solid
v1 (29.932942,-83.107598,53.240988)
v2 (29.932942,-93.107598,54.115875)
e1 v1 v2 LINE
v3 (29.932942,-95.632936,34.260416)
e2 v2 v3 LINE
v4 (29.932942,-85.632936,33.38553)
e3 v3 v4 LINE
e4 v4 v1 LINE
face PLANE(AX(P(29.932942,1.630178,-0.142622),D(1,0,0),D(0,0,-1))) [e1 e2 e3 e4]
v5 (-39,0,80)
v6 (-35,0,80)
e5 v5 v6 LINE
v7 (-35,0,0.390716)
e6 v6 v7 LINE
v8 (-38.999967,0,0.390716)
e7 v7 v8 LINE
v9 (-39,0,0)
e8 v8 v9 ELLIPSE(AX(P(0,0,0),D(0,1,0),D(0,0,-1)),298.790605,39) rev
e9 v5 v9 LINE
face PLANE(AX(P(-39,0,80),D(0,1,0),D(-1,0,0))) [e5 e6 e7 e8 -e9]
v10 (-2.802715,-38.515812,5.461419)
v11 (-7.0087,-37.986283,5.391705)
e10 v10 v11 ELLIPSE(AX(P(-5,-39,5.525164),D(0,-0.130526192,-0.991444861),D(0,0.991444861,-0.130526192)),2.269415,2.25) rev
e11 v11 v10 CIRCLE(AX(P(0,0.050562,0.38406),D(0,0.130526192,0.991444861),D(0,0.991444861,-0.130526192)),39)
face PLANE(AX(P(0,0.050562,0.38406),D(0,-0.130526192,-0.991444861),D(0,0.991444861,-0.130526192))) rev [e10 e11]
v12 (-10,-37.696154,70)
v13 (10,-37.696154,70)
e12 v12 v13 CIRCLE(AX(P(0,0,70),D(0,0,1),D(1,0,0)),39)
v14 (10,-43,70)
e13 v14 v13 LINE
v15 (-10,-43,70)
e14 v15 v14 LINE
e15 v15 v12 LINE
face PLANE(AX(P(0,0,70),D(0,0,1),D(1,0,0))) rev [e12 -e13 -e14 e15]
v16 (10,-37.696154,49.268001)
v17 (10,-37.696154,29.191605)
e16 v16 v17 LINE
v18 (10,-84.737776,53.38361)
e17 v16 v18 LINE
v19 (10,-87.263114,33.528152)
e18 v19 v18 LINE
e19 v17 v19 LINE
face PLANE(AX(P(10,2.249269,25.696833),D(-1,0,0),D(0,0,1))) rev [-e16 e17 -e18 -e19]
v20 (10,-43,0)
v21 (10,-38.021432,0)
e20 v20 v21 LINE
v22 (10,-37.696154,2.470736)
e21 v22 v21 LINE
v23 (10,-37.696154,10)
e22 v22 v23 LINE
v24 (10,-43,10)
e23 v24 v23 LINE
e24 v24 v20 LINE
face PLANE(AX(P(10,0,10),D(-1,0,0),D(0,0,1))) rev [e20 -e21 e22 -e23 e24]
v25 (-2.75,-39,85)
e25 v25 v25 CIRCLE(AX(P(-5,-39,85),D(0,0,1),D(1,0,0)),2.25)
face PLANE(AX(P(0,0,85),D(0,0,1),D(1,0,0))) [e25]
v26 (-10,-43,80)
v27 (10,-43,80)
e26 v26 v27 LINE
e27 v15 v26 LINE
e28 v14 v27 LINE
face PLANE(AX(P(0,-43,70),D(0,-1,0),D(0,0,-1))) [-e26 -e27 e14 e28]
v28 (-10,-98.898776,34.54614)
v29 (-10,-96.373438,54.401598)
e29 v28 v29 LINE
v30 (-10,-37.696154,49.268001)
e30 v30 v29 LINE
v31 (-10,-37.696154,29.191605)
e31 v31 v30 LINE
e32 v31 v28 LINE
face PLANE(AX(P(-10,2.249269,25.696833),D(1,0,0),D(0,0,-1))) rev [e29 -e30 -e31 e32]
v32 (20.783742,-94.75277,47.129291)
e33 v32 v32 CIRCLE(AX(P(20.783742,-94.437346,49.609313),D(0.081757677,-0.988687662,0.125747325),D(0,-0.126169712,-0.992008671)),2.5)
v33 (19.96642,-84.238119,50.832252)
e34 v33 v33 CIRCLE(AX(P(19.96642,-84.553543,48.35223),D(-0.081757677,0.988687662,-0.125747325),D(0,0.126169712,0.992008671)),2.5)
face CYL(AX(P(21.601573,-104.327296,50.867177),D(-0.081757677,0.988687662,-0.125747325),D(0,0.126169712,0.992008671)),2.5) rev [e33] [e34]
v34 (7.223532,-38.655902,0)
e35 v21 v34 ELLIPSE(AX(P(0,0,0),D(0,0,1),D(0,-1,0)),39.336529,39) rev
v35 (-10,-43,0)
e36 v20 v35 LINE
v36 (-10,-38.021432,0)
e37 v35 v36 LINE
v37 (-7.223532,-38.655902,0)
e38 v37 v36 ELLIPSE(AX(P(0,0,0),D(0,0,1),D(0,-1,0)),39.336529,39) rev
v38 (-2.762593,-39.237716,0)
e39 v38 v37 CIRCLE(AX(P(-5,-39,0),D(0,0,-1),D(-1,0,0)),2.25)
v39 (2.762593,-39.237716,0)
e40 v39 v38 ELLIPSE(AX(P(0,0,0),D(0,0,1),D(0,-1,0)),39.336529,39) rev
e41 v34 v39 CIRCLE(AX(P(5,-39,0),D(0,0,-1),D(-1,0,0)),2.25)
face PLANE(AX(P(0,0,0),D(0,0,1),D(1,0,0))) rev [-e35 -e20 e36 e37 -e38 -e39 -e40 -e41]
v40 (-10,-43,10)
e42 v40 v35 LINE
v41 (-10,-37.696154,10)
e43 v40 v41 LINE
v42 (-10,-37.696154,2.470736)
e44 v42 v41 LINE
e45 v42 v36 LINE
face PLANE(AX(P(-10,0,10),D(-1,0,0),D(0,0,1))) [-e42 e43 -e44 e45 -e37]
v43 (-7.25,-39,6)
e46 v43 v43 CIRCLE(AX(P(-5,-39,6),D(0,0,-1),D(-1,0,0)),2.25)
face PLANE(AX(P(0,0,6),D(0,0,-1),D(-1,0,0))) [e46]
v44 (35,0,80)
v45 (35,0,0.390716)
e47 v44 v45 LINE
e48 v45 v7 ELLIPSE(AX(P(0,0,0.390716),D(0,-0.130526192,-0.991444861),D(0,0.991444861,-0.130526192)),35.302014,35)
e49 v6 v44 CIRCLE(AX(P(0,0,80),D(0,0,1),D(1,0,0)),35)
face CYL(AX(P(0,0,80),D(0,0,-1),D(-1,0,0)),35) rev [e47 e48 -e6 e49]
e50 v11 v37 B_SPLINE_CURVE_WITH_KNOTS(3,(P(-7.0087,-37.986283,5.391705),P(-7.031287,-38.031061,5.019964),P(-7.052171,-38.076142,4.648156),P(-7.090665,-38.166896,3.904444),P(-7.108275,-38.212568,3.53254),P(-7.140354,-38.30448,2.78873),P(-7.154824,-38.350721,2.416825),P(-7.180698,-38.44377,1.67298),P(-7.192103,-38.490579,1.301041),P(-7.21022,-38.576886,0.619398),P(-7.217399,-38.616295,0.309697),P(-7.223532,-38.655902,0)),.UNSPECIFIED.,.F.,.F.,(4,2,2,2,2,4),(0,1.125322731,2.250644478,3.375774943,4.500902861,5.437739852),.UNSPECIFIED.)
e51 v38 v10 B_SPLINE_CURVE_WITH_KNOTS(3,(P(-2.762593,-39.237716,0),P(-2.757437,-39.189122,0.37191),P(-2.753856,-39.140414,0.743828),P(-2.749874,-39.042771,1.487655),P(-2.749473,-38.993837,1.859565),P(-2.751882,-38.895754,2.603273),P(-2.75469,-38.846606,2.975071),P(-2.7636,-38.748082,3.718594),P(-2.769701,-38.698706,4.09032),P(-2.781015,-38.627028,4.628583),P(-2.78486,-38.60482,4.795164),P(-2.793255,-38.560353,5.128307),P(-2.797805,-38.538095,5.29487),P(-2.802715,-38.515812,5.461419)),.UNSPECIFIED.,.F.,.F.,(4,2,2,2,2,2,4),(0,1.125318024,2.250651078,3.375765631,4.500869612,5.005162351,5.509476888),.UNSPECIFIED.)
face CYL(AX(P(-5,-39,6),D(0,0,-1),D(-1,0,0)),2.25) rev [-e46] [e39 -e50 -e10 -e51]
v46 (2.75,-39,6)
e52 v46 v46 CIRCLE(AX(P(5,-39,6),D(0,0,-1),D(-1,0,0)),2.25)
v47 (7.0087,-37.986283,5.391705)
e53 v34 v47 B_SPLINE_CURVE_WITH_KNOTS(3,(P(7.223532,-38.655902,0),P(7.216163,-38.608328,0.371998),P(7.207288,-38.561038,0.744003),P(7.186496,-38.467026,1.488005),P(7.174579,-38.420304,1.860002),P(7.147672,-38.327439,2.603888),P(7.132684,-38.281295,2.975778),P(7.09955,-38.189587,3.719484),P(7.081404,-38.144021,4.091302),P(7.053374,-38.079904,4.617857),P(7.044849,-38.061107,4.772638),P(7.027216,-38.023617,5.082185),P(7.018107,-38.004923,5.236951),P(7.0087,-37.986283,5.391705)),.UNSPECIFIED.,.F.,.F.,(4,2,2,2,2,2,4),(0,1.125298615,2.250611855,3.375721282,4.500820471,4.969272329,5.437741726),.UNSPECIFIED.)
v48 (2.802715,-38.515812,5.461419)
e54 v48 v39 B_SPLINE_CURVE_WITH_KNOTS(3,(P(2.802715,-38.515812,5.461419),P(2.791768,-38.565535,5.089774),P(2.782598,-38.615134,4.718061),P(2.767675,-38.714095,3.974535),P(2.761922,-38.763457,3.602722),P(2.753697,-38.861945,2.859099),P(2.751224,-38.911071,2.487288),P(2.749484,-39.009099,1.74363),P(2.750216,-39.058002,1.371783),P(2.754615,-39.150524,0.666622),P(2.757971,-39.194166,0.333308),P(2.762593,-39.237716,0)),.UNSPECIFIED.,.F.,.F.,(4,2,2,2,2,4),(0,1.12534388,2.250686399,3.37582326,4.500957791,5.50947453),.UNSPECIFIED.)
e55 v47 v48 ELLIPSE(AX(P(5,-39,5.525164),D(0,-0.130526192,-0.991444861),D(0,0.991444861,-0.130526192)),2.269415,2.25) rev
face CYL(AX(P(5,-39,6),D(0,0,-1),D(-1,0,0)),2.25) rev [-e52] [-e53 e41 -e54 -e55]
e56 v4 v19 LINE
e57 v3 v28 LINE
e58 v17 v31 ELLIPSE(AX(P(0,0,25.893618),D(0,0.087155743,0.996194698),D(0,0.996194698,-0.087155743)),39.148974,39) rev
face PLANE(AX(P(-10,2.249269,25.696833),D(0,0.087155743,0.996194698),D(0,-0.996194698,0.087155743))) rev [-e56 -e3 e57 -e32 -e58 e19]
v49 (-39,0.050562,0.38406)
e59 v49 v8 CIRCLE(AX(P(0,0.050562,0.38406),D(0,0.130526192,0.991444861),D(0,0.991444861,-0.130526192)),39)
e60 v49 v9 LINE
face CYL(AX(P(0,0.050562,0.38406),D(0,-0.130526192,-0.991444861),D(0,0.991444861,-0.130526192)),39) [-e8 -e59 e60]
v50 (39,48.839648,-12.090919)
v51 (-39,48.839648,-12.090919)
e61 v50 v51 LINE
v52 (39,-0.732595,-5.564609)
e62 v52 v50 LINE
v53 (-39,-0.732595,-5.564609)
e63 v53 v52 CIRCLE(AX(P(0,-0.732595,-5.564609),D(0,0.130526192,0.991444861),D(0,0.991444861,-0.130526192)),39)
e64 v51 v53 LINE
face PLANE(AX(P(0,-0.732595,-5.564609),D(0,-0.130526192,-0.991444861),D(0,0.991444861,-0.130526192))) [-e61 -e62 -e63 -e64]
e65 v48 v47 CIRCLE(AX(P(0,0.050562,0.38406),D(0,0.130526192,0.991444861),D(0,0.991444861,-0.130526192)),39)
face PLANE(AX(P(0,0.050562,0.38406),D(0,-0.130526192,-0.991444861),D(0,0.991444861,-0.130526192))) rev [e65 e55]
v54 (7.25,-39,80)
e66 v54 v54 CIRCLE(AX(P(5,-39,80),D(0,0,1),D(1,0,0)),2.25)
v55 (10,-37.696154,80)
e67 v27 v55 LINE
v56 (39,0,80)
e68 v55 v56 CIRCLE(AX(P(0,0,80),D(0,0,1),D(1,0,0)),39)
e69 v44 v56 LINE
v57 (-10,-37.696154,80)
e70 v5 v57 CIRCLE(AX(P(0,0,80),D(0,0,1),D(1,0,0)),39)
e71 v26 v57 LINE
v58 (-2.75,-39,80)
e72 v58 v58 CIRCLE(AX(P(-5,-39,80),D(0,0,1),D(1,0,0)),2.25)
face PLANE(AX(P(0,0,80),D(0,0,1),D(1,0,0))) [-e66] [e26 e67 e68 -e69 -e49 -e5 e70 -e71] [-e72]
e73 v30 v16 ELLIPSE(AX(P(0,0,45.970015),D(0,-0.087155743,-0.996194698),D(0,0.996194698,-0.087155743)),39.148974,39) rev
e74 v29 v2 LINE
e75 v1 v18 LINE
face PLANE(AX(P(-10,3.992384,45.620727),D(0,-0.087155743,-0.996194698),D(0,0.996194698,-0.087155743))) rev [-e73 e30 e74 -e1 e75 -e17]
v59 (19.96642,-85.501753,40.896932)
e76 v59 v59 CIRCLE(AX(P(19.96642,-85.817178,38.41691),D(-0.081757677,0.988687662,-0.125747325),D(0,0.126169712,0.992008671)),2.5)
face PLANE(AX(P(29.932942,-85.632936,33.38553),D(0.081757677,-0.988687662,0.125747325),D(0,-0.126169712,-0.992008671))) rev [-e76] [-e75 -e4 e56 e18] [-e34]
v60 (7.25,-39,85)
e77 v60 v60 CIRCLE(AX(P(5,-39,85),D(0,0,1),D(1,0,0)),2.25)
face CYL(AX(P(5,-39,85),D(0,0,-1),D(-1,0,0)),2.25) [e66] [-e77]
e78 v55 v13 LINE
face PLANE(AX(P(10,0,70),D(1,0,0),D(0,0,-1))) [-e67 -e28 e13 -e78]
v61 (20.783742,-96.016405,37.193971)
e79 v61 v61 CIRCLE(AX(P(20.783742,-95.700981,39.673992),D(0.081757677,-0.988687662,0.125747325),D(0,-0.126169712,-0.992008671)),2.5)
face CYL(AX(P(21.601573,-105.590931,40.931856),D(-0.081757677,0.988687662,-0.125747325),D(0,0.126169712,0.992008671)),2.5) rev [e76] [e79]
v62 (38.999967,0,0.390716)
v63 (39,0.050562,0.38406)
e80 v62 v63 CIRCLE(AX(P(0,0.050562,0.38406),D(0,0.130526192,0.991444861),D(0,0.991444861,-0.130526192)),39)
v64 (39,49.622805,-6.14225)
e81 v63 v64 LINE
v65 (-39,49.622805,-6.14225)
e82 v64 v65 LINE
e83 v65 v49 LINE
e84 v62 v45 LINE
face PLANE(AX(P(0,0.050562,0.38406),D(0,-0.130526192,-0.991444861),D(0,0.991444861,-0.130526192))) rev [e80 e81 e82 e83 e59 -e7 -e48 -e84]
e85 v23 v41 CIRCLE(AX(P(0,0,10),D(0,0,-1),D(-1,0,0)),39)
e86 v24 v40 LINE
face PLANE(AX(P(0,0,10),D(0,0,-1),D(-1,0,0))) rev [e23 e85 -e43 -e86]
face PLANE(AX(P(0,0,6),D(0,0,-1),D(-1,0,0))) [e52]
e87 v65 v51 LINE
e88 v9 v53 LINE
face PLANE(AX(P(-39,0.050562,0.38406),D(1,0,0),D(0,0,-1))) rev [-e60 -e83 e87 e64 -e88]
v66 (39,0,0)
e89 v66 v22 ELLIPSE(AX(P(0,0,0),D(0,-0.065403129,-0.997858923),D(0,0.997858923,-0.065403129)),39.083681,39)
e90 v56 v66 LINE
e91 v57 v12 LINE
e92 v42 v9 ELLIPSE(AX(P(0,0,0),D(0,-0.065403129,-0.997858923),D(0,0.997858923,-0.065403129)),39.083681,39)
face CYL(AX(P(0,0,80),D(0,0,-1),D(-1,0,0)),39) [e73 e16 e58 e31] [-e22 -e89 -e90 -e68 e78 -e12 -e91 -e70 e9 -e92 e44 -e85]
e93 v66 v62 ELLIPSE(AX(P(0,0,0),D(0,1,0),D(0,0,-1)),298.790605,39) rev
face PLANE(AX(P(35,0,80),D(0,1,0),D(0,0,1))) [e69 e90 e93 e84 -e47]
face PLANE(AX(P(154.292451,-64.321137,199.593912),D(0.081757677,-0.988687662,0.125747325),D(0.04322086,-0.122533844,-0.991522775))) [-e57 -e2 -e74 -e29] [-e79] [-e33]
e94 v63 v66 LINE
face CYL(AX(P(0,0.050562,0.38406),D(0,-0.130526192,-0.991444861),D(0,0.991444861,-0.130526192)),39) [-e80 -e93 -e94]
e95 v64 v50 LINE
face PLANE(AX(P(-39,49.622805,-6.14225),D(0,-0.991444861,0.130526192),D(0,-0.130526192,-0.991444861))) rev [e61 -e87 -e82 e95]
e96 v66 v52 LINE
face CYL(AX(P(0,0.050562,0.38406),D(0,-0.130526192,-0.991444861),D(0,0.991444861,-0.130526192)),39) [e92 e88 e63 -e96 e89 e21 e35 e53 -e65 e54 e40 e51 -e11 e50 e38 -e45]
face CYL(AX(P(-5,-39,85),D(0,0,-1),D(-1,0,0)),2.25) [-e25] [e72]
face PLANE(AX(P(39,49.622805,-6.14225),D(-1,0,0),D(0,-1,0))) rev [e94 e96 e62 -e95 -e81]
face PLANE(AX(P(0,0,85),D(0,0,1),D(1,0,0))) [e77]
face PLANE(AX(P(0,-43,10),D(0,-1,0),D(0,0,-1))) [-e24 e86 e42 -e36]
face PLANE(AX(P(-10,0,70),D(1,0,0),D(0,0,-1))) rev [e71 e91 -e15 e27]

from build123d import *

# Parameters (mm, degrees)
EXTRUDE_THIN1_DEPTH       = 80
BOSS_EXTRUDE1_START       = -10
BOSS_EXTRUDE1_DEPTH       = 10
SKETCH3_R                 = 2.25
BOSS_EXTRUDE2_DEPTH       = 5
BOSS_EXTRUDE3_DEPTH       = 10
SKETCH5_R                 = 2.25
CUT_EXTRUDE1_DEPTH        = 6
BOSS_EXTRUDE4_REACH       = 104.415
BOSS_EXTRUDE4_END_RADIUS  = 39
SKETCH10_W                = 20
SKETCH10_H                = 20
BOSS_EXTRUDE6_DEPTH       = 6
BOSS_EXTRUDE7_START       = -51.724499634
BOSS_EXTRUDE7_OUTLINE_W   = 20
BOSS_EXTRUDE7_OUTLINE_H   = 20
BOSS_EXTRUDE7_DEPTH       = 51.724499634
BOSS_EXTRUDE7_START_2     = 101.306507824
BOSS_EXTRUDE7_2_OUTLINE_W = 23
BOSS_EXTRUDE7_2_OUTLINE_H = 23
BOSS_EXTRUDE7_2_DEPTH     = 3.693492176
BOSS_EXTRUDE9_DEPTH       = 20
SKETCH16_R                = 2.5
CUT_EXTRUDE2_DEPTH        = 20


with BuildPart() as part:
    # Sketch1 → Extrude-Thin1 (new body)
    with BuildSketch(Plane.XY):
        with BuildLine():
            ThreePointArc((-35, 0), (0, -35), (35, 0))
            Line((35, 0), (39, 0))
            ThreePointArc((39, 0), (0, -39), (-39, 0))
            Line((-39, 0), (-35, 0))
        make_face()
    extrude(amount=EXTRUDE_THIN1_DEPTH)

    # Sketch2 → Boss-Extrude1 (add)
    with BuildSketch(Plane.XY.offset(80).offset(BOSS_EXTRUDE1_START)):
        with BuildLine():
            Line((0, -39), (0, -35))
            Line((0, -35), (-10, -35))
            Line((-10, -35), (-10, -37.69615365))
            ThreePointArc((-10, -37.69615365), (-5.042321274, -38.672664715), (0, -39))
        make_face()
        with BuildLine():
            Line((10, -35), (0, -35))
            Line((0, -35), (0, -39))
            ThreePointArc((0, -39), (5.042321274, -38.672664715), (10, -37.69615365))
            Line((10, -37.69615365), (10, -35))
        make_face()
        with BuildLine():
            ThreePointArc((10, -37.69615365), (5.042321274, -38.672664715), (0, -39))
            ThreePointArc((0, -39), (-5.042321274, -38.672664715), (-10, -37.69615365))
            Line((-10, -37.69615365), (-10, -43))
            Line((-10, -43), (10, -43))
            Line((10, -43), (10, -37.69615365))
        make_face()
    extrude(amount=BOSS_EXTRUDE1_DEPTH)

    # Sketch3 → Boss-Extrude2 (add)
    with BuildSketch(Plane.XY.offset(80)):
        with Locations((-5, -39)):
            Circle(SKETCH3_R)
        with Locations((5, -39)):
            Circle(SKETCH3_R)
    extrude(amount=BOSS_EXTRUDE2_DEPTH)

    # Sketch4 → Boss-Extrude3 (add)
    with BuildSketch(Plane(origin=(0, 0, 0), x_dir=(-1, 0, 0), z_dir=(0, 0, -1))):
        with BuildLine():
            Line((0, -39), (0, -35))
            Line((0, -35), (-10, -35))
            Line((-10, -35), (-10, -37.69615365))
            ThreePointArc((-10, -37.69615365), (-5.042321274, -38.672664715), (0, -39))
        make_face()
        with BuildLine():
            ThreePointArc((10, -37.69615365), (5.042321274, -38.672664715), (0, -39))
            ThreePointArc((0, -39), (-5.042321274, -38.672664715), (-10, -37.69615365))
            Line((-10, -37.69615365), (-10, -43))
            Line((-10, -43), (10, -43))
            Line((10, -43), (10, -37.69615365))
        make_face()
        with BuildLine():
            Line((10, -35), (0, -35))
            Line((0, -35), (0, -39))
            ThreePointArc((0, -39), (5.042321274, -38.672664715), (10, -37.69615365))
            Line((10, -37.69615365), (10, -35))
        make_face()
    extrude(amount=-BOSS_EXTRUDE3_DEPTH)

    # Sketch5 → Cut-Extrude1 (cut)
    with BuildSketch(Plane(origin=(0, 0, 0), x_dir=(-1, 0, 0), z_dir=(0, 0, -1))):
        with Locations(Location((-5, -39, 0), (0, 0, 180))):
            Circle(SKETCH5_R)
        with Locations(Location((5, -39, 0), (0, 0, 180))):
            Circle(SKETCH5_R)
    extrude(amount=-CUT_EXTRUDE1_DEPTH, mode=Mode.SUBTRACT)

    # Boss-Extrude4: up to this cylinder (the profile starts outside it)
    boss_extrude4_end = Plane(origin=(0, 0, 40), z_dir=(0, 0, -1)) * Cylinder(BOSS_EXTRUDE4_END_RADIUS, 287.83, mode=Mode.PRIVATE)
    # Sketch10 → Boss-Extrude4 (add, up to the surface)
    with BuildSketch(Plane(origin=(0, -49.619293796, 4.341125699), x_dir=(1, 0, 0), z_dir=(0, 0.9961946980917462, -0.08715574274765152)), mode=Mode.PRIVATE) as boss_extrude4_sk1:
        with Locations((0, -35.795085407)):
            Rectangle(SKETCH10_W, SKETCH10_H)
    boss_extrude4_tool1 = extrude(boss_extrude4_sk1.sketch, amount=BOSS_EXTRUDE4_REACH, mode=Mode.PRIVATE) - boss_extrude4_end
    add(boss_extrude4_tool1.solids().sort_by_distance((0, -46.499547, 40))[0])

    # Sketch14 → Boss-Extrude6 (add)
    with BuildSketch(Plane(origin=(0, -0.732594735, -5.56460947), x_dir=(1, 0, 0), z_dir=(0, 0.130526192220045, 0.9914448613738114))):
        with BuildLine():
            Line((-39, 0), (-39, 50))
            Line((-39, 50), (39, 50))
            Line((39, 50), (39, 0))
            ThreePointArc((39, 0), (0, -39), (-39, 0))
        make_face()
    extrude(amount=BOSS_EXTRUDE6_DEPTH)

    # Boss-Extrude7: read off the stored shape, not the designer's step
    # Boss-Extrude7 outline → Boss-Extrude7 (add)
    with BuildSketch(Plane(origin=(0, -49.619293796, 4.341125699), x_dir=(1, 0, 0), z_dir=(0, 0.9961946980917462, -0.08715574274765152)).offset(BOSS_EXTRUDE7_START)):
        with Locations((0, -35.795085407)):
            Rectangle(BOSS_EXTRUDE7_OUTLINE_W, BOSS_EXTRUDE7_OUTLINE_H)
    extrude(amount=BOSS_EXTRUDE7_DEPTH)

    # Boss-Extrude7 2 outline → Boss-Extrude7 2 (cut)
    with BuildSketch(Plane(origin=(0, 0, 0), x_dir=(0.9966522374056315, 0.08110432407614718, -0.010315342480997143), z_dir=(0.08175767654690885, -0.9886876617314986, 0.1257473254807149)).offset(BOSS_EXTRUDE7_START_2)):
        with Locations((-8.5, 31.5)):
            Rectangle(BOSS_EXTRUDE7_2_OUTLINE_W, BOSS_EXTRUDE7_2_OUTLINE_H)
    extrude(amount=BOSS_EXTRUDE7_2_DEPTH, mode=Mode.SUBTRACT)

    # Sketch15 → Boss-Extrude9 (add, along a direction that is not the sketch's normal)
    with BuildSketch(Plane(origin=(10, 0, 0), x_dir=(0, 0, -1), z_dir=(1, 0, 0))):
        Polygon((-54.258496601, -94.737775996), (-34.403038319, -97.263114251), (-33.528151684, -87.263114251), (-53.383609966, -84.737775996), align=None)
    extrude(amount=BOSS_EXTRUDE9_DEPTH, dir=(0.9966471031139099, 0.08150889038643343, -0.007131103885357661))

    # Sketch16 → Cut-Extrude2 (cut)
    with BuildSketch(Plane(origin=(7.465262096, -90.276691283, 11.481940072), x_dir=(0.9966522374056315, 0.08110432407614722, -0.010315342480997126), z_dir=(-0.0817576765469089, 0.9886876617314987, -0.12574732548071466))):
        with Locations(Location((12.543149078, -37.29773566, 0), (0, 0, 270))):
            Circle(SKETCH16_R)
        with Locations(Location((12.543149078, -27.282379188, 0), (0, 0, 270))):
            Circle(SKETCH16_R)
    extrude(amount=-CUT_EXTRUDE2_DEPTH, mode=Mode.SUBTRACT)


solid = part.part
